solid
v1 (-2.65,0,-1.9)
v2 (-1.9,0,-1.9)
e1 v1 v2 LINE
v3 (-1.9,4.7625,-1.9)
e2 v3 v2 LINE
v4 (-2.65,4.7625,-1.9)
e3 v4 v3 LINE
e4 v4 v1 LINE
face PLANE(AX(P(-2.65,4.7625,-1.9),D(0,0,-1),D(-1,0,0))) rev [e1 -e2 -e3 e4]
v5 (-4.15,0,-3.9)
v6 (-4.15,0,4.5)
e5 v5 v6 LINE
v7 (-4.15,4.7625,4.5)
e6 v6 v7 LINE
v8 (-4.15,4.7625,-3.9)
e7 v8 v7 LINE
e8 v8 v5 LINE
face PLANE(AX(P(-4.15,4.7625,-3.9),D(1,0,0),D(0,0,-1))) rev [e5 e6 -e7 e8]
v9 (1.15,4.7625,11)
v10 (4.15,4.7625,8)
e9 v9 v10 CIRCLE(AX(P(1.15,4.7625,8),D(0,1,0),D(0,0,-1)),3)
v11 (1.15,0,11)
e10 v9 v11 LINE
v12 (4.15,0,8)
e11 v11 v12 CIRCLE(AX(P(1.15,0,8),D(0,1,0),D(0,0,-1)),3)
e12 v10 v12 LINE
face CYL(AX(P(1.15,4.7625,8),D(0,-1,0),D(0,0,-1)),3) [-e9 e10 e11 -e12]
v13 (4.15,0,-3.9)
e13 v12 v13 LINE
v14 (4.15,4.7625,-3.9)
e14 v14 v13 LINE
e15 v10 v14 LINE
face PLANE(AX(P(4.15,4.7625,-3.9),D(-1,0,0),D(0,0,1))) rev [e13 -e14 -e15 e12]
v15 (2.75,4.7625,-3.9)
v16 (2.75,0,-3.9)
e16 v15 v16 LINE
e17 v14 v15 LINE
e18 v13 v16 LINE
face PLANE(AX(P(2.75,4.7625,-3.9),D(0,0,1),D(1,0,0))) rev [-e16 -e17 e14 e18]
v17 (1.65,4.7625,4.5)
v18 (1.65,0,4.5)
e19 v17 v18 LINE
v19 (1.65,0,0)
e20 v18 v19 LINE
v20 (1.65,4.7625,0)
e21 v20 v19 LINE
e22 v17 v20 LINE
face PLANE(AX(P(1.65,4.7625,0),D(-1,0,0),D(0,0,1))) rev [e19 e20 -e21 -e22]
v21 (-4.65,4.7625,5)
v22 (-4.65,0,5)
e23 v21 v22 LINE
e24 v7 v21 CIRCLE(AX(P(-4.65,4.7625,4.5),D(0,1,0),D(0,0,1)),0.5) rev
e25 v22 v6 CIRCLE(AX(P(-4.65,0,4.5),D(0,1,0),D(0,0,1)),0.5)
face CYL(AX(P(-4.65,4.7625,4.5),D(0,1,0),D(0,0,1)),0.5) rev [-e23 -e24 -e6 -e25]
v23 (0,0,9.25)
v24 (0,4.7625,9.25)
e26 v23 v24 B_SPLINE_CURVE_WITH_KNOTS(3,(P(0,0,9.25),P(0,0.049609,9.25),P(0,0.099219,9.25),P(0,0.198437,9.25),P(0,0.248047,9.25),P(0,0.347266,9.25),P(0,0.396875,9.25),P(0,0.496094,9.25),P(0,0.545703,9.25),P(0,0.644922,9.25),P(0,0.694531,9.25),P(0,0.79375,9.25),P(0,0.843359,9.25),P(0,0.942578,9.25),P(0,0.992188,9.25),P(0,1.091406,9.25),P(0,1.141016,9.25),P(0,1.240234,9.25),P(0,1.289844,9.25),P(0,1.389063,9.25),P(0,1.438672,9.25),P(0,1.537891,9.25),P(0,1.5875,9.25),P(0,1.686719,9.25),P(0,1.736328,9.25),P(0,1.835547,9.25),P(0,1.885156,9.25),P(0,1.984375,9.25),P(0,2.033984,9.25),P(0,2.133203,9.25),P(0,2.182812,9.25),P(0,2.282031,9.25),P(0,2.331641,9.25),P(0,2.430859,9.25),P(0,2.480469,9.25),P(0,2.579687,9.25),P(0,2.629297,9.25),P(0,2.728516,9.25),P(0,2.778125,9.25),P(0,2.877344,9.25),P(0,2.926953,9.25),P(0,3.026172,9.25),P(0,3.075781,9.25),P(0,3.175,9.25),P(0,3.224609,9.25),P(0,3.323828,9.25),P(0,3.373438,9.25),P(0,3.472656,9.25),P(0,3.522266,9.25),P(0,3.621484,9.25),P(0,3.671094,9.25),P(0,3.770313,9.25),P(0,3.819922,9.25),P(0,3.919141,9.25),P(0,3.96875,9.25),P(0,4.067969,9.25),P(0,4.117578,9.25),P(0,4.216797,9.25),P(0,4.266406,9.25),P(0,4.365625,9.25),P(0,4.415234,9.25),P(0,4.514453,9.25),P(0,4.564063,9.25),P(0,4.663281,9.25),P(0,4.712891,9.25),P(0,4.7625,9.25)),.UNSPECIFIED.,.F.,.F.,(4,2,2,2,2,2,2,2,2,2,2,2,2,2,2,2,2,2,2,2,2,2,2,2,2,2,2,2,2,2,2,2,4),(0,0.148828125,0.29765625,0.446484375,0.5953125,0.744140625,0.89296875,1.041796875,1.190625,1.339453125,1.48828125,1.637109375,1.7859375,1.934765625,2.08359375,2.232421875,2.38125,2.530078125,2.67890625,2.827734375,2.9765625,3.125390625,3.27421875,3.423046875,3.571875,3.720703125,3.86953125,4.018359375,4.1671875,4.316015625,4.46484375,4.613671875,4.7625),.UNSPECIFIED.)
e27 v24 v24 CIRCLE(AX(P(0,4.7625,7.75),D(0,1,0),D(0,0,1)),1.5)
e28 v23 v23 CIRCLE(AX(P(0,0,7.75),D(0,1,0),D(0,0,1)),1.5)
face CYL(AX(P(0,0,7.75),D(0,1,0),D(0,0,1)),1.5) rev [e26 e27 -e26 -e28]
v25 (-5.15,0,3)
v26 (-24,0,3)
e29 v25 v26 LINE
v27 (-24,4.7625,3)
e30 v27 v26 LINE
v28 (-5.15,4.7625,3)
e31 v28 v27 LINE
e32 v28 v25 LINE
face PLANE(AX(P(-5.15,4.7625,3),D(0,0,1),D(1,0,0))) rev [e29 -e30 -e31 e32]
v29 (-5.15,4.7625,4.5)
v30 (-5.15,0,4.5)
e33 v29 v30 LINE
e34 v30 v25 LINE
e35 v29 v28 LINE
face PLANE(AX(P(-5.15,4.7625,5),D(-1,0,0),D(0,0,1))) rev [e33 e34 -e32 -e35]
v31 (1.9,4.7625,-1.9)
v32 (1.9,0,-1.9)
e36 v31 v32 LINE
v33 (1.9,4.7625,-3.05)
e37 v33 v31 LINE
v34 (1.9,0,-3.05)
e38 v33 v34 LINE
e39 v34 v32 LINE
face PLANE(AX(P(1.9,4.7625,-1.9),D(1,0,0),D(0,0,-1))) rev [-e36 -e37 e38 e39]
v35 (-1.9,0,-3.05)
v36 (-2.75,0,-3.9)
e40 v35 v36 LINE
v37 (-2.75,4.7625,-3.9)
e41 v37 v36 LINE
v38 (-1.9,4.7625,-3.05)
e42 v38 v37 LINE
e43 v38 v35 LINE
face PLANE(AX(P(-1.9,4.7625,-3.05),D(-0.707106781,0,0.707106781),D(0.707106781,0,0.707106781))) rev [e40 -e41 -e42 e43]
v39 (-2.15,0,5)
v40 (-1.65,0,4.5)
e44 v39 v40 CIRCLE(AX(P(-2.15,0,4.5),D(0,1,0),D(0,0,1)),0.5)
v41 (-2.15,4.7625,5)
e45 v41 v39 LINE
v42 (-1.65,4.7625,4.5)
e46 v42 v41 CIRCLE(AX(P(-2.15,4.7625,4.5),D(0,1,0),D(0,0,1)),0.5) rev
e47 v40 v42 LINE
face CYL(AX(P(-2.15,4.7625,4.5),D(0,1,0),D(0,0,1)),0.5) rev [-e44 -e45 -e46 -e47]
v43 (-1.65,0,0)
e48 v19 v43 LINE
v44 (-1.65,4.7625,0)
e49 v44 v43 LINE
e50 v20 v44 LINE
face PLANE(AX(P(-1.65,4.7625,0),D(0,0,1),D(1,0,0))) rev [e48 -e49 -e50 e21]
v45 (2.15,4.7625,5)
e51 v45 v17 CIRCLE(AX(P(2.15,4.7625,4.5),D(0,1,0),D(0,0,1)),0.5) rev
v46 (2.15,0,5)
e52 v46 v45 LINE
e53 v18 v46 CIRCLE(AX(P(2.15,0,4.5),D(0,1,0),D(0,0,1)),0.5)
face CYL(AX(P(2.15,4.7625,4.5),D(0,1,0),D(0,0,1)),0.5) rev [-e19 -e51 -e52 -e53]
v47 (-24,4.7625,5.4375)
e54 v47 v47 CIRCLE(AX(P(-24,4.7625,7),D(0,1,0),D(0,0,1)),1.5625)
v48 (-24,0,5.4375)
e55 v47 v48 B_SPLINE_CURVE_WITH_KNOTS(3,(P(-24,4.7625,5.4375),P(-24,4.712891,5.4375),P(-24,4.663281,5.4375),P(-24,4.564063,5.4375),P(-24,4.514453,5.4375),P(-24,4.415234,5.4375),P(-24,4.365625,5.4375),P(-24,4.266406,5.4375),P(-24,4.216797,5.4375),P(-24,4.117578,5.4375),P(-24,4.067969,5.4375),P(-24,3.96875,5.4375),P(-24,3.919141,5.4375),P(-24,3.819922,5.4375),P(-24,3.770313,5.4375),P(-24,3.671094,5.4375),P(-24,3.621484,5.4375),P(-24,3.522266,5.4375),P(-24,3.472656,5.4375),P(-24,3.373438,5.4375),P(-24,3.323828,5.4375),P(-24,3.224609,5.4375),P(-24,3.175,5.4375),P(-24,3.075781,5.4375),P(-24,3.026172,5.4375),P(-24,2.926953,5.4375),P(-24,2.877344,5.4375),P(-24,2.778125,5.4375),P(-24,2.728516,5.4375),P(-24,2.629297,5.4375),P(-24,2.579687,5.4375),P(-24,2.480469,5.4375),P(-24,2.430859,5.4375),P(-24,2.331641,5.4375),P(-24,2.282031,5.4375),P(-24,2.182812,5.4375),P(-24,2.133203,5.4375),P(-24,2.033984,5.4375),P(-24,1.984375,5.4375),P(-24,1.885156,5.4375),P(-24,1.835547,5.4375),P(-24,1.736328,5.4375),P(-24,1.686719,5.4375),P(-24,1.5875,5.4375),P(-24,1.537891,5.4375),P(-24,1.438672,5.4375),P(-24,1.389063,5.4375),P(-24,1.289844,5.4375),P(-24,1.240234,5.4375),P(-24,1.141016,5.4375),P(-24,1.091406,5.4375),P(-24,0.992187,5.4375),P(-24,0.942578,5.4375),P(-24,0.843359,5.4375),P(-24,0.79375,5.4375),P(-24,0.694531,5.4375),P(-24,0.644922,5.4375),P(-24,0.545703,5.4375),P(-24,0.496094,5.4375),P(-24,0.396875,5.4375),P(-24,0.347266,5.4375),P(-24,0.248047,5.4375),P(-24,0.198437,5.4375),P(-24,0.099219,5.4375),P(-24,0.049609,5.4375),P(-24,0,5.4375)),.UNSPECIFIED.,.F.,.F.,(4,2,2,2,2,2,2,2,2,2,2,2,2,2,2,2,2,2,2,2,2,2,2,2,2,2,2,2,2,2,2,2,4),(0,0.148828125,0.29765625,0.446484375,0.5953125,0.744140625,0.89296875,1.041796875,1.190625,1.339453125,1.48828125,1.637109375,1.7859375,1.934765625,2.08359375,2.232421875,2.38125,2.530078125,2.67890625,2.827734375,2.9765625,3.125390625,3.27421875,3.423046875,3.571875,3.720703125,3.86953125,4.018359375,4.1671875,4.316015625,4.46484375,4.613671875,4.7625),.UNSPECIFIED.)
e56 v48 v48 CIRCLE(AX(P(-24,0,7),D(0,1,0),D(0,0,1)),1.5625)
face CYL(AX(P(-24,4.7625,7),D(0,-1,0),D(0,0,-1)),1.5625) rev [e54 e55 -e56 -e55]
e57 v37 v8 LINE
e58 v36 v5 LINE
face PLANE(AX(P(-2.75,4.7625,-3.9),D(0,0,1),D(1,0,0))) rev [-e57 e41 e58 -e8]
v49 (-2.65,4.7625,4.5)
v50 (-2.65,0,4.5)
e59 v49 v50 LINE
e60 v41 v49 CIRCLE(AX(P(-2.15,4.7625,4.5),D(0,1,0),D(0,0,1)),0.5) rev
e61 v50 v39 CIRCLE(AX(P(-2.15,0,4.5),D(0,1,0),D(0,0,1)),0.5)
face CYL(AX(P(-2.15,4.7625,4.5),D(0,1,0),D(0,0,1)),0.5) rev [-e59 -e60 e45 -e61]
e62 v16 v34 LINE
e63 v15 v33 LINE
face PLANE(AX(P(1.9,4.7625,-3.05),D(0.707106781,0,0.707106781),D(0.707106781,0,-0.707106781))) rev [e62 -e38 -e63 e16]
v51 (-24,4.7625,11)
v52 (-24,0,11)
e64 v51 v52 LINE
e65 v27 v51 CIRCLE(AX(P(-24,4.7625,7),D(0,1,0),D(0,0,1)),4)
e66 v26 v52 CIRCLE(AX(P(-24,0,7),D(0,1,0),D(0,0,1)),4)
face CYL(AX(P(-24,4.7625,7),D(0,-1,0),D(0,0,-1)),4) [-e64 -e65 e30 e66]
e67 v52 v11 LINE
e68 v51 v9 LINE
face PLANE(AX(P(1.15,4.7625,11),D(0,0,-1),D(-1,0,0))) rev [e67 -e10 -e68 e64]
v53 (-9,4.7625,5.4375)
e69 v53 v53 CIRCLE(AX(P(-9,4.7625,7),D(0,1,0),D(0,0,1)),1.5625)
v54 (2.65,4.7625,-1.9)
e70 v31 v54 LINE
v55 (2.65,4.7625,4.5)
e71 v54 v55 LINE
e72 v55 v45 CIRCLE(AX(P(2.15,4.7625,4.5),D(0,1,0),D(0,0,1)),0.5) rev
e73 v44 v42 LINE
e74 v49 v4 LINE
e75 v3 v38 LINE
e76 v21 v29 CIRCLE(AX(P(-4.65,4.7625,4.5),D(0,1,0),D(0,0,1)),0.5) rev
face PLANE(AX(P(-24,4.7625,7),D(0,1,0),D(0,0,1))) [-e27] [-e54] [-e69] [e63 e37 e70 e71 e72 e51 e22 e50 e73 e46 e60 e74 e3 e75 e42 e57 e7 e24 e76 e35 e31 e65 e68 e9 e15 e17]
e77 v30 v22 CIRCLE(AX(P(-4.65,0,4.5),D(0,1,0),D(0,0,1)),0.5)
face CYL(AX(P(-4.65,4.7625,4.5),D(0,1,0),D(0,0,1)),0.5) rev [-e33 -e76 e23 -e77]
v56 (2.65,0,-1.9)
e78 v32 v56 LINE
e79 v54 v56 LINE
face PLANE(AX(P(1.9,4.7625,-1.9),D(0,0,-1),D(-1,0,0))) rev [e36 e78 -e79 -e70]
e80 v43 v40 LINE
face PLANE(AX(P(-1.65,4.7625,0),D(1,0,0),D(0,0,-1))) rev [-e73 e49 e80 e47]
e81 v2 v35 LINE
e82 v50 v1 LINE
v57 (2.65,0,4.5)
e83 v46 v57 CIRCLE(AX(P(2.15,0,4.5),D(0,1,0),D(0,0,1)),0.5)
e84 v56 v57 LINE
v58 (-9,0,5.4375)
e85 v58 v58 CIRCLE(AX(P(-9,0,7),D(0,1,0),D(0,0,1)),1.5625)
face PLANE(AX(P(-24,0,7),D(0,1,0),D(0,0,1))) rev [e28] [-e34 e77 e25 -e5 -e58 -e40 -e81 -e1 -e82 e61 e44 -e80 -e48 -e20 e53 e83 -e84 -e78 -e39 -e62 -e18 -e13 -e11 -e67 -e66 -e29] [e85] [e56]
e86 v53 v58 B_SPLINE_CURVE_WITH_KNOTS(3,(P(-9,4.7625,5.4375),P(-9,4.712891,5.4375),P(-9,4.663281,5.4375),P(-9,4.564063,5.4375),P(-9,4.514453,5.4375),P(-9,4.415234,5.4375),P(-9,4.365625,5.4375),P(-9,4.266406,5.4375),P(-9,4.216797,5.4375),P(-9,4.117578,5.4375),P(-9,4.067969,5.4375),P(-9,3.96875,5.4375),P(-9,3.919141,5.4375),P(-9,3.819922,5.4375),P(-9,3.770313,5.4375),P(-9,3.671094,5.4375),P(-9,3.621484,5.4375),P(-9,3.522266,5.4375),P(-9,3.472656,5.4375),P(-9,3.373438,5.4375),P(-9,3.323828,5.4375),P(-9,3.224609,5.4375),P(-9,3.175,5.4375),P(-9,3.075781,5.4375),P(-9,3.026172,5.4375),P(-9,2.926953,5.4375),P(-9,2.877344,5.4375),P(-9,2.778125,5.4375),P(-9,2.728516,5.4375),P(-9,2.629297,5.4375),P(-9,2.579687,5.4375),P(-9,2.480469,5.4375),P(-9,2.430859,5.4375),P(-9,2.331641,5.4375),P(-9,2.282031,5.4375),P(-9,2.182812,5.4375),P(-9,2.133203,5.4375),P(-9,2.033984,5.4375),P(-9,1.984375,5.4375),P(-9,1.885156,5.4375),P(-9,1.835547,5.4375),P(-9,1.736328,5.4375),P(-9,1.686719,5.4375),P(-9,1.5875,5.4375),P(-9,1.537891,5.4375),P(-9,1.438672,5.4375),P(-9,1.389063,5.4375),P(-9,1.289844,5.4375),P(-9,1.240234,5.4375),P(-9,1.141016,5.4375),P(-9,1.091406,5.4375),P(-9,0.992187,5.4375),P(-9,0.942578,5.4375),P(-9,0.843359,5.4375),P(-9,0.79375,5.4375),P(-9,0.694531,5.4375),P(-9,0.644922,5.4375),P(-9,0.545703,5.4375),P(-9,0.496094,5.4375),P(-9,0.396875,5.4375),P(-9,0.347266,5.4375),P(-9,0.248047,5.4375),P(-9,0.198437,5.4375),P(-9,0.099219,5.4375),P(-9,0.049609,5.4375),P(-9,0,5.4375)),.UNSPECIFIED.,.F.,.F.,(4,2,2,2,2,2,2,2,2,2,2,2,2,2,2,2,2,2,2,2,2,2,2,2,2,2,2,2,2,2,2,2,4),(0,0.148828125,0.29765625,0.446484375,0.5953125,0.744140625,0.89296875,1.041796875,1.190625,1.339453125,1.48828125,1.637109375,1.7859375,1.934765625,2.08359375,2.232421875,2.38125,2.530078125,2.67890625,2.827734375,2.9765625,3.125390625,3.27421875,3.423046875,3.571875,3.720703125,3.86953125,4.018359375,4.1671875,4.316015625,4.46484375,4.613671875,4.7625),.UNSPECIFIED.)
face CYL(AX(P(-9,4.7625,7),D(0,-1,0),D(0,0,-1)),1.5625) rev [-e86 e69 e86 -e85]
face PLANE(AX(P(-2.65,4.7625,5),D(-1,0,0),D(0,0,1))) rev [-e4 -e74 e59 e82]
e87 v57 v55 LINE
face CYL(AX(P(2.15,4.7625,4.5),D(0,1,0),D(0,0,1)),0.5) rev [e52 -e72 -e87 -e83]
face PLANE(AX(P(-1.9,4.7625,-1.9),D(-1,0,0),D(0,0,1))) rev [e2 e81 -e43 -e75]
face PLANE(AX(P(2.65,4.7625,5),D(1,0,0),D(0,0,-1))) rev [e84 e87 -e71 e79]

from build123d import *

# Parameters (mm, degrees)
SKETCH1_R           = 1.5625
BOSS_EXTRUDE1_DEPTH = 4.7625
FILLET1_R           = 0.5
SKETCH2_R           = 1.5
CUT_EXTRUDE1_DEPTH  = 31.457862798


with BuildPart() as part:
    # Sketch1 → Boss-Extrude1 (new body)
    with BuildSketch(Plane(origin=(0, 0, 0), x_dir=(1, 0, 0), z_dir=(0, 1, 0))):
        with BuildLine():
            Line((-1.65, 0), (1.65, 0))
            Line((1.65, 0), (1.65, -5))
            Line((1.65, -5), (2.65, -5))
            Line((2.65, -5), (2.65, 1.9))
            Line((2.65, 1.9), (1.9, 1.9))
            Line((1.9, 1.9), (1.9, 3.05))
            Line((1.9, 3.05), (2.75, 3.9))
            Line((2.75, 3.9), (4.15, 3.9))
            Line((4.15, 3.9), (4.15, -8))
            ThreePointArc((4.15, -8), (3.271320344, -10.121320344), (1.15, -11))
            Line((1.15, -11), (-24, -11))
            ThreePointArc((-24, -11), (-28, -7), (-24, -3))
            Line((-24, -3), (-5.15, -3))
            Line((-5.15, -3), (-5.15, -5))
            Line((-5.15, -5), (-4.15, -5))
            Line((-4.15, -5), (-4.15, 3.9))
            Line((-4.15, 3.9), (-2.75, 3.9))
            Line((-2.75, 3.9), (-1.9, 3.05))
            Line((-1.9, 3.05), (-1.9, 1.9))
            Line((-1.9, 1.9), (-2.65, 1.9))
            Line((-2.65, 1.9), (-2.65, -5))
            Line((-2.65, -5), (-1.65, -5))
            Line((-1.65, -5), (-1.65, 0))
        make_face()
        with Locations(Location((-24, -7, 0), (0, 0, 90))):
            Circle(SKETCH1_R, mode=Mode.SUBTRACT)
        with Locations(Location((-9, -7, 0), (0, 0, 90))):
            Circle(SKETCH1_R, mode=Mode.SUBTRACT)
    extrude(amount=BOSS_EXTRUDE1_DEPTH)

    # Fillet1
    fillet1_edges = [part.edges().sort_by_distance(p)[0] for p in [
        (-2.65, 2.38125, 5),
        (-1.65, 2.38125, 5),
        (2.65, 2.38125, 5),
        (1.65, 2.38125, 5),
        (-5.15, 2.38125, 5),
        (-4.15, 2.38125, 5),
    ]]
    fillet(fillet1_edges, radius=FILLET1_R - 0.0001)  # a hair under: the kernel refuses the full size

    # Sketch2 → Cut-Extrude1 (cut, through all)
    with BuildSketch(Plane(origin=(0, 4.7625, 0), x_dir=(1, 0, 0), z_dir=(0, 1, 0))):
        with Locations(Location((0, -7.75, 0), (0, 0, 270))):
            Circle(SKETCH2_R)
    extrude(amount=-CUT_EXTRUDE1_DEPTH, mode=Mode.SUBTRACT)


solid = part.part
